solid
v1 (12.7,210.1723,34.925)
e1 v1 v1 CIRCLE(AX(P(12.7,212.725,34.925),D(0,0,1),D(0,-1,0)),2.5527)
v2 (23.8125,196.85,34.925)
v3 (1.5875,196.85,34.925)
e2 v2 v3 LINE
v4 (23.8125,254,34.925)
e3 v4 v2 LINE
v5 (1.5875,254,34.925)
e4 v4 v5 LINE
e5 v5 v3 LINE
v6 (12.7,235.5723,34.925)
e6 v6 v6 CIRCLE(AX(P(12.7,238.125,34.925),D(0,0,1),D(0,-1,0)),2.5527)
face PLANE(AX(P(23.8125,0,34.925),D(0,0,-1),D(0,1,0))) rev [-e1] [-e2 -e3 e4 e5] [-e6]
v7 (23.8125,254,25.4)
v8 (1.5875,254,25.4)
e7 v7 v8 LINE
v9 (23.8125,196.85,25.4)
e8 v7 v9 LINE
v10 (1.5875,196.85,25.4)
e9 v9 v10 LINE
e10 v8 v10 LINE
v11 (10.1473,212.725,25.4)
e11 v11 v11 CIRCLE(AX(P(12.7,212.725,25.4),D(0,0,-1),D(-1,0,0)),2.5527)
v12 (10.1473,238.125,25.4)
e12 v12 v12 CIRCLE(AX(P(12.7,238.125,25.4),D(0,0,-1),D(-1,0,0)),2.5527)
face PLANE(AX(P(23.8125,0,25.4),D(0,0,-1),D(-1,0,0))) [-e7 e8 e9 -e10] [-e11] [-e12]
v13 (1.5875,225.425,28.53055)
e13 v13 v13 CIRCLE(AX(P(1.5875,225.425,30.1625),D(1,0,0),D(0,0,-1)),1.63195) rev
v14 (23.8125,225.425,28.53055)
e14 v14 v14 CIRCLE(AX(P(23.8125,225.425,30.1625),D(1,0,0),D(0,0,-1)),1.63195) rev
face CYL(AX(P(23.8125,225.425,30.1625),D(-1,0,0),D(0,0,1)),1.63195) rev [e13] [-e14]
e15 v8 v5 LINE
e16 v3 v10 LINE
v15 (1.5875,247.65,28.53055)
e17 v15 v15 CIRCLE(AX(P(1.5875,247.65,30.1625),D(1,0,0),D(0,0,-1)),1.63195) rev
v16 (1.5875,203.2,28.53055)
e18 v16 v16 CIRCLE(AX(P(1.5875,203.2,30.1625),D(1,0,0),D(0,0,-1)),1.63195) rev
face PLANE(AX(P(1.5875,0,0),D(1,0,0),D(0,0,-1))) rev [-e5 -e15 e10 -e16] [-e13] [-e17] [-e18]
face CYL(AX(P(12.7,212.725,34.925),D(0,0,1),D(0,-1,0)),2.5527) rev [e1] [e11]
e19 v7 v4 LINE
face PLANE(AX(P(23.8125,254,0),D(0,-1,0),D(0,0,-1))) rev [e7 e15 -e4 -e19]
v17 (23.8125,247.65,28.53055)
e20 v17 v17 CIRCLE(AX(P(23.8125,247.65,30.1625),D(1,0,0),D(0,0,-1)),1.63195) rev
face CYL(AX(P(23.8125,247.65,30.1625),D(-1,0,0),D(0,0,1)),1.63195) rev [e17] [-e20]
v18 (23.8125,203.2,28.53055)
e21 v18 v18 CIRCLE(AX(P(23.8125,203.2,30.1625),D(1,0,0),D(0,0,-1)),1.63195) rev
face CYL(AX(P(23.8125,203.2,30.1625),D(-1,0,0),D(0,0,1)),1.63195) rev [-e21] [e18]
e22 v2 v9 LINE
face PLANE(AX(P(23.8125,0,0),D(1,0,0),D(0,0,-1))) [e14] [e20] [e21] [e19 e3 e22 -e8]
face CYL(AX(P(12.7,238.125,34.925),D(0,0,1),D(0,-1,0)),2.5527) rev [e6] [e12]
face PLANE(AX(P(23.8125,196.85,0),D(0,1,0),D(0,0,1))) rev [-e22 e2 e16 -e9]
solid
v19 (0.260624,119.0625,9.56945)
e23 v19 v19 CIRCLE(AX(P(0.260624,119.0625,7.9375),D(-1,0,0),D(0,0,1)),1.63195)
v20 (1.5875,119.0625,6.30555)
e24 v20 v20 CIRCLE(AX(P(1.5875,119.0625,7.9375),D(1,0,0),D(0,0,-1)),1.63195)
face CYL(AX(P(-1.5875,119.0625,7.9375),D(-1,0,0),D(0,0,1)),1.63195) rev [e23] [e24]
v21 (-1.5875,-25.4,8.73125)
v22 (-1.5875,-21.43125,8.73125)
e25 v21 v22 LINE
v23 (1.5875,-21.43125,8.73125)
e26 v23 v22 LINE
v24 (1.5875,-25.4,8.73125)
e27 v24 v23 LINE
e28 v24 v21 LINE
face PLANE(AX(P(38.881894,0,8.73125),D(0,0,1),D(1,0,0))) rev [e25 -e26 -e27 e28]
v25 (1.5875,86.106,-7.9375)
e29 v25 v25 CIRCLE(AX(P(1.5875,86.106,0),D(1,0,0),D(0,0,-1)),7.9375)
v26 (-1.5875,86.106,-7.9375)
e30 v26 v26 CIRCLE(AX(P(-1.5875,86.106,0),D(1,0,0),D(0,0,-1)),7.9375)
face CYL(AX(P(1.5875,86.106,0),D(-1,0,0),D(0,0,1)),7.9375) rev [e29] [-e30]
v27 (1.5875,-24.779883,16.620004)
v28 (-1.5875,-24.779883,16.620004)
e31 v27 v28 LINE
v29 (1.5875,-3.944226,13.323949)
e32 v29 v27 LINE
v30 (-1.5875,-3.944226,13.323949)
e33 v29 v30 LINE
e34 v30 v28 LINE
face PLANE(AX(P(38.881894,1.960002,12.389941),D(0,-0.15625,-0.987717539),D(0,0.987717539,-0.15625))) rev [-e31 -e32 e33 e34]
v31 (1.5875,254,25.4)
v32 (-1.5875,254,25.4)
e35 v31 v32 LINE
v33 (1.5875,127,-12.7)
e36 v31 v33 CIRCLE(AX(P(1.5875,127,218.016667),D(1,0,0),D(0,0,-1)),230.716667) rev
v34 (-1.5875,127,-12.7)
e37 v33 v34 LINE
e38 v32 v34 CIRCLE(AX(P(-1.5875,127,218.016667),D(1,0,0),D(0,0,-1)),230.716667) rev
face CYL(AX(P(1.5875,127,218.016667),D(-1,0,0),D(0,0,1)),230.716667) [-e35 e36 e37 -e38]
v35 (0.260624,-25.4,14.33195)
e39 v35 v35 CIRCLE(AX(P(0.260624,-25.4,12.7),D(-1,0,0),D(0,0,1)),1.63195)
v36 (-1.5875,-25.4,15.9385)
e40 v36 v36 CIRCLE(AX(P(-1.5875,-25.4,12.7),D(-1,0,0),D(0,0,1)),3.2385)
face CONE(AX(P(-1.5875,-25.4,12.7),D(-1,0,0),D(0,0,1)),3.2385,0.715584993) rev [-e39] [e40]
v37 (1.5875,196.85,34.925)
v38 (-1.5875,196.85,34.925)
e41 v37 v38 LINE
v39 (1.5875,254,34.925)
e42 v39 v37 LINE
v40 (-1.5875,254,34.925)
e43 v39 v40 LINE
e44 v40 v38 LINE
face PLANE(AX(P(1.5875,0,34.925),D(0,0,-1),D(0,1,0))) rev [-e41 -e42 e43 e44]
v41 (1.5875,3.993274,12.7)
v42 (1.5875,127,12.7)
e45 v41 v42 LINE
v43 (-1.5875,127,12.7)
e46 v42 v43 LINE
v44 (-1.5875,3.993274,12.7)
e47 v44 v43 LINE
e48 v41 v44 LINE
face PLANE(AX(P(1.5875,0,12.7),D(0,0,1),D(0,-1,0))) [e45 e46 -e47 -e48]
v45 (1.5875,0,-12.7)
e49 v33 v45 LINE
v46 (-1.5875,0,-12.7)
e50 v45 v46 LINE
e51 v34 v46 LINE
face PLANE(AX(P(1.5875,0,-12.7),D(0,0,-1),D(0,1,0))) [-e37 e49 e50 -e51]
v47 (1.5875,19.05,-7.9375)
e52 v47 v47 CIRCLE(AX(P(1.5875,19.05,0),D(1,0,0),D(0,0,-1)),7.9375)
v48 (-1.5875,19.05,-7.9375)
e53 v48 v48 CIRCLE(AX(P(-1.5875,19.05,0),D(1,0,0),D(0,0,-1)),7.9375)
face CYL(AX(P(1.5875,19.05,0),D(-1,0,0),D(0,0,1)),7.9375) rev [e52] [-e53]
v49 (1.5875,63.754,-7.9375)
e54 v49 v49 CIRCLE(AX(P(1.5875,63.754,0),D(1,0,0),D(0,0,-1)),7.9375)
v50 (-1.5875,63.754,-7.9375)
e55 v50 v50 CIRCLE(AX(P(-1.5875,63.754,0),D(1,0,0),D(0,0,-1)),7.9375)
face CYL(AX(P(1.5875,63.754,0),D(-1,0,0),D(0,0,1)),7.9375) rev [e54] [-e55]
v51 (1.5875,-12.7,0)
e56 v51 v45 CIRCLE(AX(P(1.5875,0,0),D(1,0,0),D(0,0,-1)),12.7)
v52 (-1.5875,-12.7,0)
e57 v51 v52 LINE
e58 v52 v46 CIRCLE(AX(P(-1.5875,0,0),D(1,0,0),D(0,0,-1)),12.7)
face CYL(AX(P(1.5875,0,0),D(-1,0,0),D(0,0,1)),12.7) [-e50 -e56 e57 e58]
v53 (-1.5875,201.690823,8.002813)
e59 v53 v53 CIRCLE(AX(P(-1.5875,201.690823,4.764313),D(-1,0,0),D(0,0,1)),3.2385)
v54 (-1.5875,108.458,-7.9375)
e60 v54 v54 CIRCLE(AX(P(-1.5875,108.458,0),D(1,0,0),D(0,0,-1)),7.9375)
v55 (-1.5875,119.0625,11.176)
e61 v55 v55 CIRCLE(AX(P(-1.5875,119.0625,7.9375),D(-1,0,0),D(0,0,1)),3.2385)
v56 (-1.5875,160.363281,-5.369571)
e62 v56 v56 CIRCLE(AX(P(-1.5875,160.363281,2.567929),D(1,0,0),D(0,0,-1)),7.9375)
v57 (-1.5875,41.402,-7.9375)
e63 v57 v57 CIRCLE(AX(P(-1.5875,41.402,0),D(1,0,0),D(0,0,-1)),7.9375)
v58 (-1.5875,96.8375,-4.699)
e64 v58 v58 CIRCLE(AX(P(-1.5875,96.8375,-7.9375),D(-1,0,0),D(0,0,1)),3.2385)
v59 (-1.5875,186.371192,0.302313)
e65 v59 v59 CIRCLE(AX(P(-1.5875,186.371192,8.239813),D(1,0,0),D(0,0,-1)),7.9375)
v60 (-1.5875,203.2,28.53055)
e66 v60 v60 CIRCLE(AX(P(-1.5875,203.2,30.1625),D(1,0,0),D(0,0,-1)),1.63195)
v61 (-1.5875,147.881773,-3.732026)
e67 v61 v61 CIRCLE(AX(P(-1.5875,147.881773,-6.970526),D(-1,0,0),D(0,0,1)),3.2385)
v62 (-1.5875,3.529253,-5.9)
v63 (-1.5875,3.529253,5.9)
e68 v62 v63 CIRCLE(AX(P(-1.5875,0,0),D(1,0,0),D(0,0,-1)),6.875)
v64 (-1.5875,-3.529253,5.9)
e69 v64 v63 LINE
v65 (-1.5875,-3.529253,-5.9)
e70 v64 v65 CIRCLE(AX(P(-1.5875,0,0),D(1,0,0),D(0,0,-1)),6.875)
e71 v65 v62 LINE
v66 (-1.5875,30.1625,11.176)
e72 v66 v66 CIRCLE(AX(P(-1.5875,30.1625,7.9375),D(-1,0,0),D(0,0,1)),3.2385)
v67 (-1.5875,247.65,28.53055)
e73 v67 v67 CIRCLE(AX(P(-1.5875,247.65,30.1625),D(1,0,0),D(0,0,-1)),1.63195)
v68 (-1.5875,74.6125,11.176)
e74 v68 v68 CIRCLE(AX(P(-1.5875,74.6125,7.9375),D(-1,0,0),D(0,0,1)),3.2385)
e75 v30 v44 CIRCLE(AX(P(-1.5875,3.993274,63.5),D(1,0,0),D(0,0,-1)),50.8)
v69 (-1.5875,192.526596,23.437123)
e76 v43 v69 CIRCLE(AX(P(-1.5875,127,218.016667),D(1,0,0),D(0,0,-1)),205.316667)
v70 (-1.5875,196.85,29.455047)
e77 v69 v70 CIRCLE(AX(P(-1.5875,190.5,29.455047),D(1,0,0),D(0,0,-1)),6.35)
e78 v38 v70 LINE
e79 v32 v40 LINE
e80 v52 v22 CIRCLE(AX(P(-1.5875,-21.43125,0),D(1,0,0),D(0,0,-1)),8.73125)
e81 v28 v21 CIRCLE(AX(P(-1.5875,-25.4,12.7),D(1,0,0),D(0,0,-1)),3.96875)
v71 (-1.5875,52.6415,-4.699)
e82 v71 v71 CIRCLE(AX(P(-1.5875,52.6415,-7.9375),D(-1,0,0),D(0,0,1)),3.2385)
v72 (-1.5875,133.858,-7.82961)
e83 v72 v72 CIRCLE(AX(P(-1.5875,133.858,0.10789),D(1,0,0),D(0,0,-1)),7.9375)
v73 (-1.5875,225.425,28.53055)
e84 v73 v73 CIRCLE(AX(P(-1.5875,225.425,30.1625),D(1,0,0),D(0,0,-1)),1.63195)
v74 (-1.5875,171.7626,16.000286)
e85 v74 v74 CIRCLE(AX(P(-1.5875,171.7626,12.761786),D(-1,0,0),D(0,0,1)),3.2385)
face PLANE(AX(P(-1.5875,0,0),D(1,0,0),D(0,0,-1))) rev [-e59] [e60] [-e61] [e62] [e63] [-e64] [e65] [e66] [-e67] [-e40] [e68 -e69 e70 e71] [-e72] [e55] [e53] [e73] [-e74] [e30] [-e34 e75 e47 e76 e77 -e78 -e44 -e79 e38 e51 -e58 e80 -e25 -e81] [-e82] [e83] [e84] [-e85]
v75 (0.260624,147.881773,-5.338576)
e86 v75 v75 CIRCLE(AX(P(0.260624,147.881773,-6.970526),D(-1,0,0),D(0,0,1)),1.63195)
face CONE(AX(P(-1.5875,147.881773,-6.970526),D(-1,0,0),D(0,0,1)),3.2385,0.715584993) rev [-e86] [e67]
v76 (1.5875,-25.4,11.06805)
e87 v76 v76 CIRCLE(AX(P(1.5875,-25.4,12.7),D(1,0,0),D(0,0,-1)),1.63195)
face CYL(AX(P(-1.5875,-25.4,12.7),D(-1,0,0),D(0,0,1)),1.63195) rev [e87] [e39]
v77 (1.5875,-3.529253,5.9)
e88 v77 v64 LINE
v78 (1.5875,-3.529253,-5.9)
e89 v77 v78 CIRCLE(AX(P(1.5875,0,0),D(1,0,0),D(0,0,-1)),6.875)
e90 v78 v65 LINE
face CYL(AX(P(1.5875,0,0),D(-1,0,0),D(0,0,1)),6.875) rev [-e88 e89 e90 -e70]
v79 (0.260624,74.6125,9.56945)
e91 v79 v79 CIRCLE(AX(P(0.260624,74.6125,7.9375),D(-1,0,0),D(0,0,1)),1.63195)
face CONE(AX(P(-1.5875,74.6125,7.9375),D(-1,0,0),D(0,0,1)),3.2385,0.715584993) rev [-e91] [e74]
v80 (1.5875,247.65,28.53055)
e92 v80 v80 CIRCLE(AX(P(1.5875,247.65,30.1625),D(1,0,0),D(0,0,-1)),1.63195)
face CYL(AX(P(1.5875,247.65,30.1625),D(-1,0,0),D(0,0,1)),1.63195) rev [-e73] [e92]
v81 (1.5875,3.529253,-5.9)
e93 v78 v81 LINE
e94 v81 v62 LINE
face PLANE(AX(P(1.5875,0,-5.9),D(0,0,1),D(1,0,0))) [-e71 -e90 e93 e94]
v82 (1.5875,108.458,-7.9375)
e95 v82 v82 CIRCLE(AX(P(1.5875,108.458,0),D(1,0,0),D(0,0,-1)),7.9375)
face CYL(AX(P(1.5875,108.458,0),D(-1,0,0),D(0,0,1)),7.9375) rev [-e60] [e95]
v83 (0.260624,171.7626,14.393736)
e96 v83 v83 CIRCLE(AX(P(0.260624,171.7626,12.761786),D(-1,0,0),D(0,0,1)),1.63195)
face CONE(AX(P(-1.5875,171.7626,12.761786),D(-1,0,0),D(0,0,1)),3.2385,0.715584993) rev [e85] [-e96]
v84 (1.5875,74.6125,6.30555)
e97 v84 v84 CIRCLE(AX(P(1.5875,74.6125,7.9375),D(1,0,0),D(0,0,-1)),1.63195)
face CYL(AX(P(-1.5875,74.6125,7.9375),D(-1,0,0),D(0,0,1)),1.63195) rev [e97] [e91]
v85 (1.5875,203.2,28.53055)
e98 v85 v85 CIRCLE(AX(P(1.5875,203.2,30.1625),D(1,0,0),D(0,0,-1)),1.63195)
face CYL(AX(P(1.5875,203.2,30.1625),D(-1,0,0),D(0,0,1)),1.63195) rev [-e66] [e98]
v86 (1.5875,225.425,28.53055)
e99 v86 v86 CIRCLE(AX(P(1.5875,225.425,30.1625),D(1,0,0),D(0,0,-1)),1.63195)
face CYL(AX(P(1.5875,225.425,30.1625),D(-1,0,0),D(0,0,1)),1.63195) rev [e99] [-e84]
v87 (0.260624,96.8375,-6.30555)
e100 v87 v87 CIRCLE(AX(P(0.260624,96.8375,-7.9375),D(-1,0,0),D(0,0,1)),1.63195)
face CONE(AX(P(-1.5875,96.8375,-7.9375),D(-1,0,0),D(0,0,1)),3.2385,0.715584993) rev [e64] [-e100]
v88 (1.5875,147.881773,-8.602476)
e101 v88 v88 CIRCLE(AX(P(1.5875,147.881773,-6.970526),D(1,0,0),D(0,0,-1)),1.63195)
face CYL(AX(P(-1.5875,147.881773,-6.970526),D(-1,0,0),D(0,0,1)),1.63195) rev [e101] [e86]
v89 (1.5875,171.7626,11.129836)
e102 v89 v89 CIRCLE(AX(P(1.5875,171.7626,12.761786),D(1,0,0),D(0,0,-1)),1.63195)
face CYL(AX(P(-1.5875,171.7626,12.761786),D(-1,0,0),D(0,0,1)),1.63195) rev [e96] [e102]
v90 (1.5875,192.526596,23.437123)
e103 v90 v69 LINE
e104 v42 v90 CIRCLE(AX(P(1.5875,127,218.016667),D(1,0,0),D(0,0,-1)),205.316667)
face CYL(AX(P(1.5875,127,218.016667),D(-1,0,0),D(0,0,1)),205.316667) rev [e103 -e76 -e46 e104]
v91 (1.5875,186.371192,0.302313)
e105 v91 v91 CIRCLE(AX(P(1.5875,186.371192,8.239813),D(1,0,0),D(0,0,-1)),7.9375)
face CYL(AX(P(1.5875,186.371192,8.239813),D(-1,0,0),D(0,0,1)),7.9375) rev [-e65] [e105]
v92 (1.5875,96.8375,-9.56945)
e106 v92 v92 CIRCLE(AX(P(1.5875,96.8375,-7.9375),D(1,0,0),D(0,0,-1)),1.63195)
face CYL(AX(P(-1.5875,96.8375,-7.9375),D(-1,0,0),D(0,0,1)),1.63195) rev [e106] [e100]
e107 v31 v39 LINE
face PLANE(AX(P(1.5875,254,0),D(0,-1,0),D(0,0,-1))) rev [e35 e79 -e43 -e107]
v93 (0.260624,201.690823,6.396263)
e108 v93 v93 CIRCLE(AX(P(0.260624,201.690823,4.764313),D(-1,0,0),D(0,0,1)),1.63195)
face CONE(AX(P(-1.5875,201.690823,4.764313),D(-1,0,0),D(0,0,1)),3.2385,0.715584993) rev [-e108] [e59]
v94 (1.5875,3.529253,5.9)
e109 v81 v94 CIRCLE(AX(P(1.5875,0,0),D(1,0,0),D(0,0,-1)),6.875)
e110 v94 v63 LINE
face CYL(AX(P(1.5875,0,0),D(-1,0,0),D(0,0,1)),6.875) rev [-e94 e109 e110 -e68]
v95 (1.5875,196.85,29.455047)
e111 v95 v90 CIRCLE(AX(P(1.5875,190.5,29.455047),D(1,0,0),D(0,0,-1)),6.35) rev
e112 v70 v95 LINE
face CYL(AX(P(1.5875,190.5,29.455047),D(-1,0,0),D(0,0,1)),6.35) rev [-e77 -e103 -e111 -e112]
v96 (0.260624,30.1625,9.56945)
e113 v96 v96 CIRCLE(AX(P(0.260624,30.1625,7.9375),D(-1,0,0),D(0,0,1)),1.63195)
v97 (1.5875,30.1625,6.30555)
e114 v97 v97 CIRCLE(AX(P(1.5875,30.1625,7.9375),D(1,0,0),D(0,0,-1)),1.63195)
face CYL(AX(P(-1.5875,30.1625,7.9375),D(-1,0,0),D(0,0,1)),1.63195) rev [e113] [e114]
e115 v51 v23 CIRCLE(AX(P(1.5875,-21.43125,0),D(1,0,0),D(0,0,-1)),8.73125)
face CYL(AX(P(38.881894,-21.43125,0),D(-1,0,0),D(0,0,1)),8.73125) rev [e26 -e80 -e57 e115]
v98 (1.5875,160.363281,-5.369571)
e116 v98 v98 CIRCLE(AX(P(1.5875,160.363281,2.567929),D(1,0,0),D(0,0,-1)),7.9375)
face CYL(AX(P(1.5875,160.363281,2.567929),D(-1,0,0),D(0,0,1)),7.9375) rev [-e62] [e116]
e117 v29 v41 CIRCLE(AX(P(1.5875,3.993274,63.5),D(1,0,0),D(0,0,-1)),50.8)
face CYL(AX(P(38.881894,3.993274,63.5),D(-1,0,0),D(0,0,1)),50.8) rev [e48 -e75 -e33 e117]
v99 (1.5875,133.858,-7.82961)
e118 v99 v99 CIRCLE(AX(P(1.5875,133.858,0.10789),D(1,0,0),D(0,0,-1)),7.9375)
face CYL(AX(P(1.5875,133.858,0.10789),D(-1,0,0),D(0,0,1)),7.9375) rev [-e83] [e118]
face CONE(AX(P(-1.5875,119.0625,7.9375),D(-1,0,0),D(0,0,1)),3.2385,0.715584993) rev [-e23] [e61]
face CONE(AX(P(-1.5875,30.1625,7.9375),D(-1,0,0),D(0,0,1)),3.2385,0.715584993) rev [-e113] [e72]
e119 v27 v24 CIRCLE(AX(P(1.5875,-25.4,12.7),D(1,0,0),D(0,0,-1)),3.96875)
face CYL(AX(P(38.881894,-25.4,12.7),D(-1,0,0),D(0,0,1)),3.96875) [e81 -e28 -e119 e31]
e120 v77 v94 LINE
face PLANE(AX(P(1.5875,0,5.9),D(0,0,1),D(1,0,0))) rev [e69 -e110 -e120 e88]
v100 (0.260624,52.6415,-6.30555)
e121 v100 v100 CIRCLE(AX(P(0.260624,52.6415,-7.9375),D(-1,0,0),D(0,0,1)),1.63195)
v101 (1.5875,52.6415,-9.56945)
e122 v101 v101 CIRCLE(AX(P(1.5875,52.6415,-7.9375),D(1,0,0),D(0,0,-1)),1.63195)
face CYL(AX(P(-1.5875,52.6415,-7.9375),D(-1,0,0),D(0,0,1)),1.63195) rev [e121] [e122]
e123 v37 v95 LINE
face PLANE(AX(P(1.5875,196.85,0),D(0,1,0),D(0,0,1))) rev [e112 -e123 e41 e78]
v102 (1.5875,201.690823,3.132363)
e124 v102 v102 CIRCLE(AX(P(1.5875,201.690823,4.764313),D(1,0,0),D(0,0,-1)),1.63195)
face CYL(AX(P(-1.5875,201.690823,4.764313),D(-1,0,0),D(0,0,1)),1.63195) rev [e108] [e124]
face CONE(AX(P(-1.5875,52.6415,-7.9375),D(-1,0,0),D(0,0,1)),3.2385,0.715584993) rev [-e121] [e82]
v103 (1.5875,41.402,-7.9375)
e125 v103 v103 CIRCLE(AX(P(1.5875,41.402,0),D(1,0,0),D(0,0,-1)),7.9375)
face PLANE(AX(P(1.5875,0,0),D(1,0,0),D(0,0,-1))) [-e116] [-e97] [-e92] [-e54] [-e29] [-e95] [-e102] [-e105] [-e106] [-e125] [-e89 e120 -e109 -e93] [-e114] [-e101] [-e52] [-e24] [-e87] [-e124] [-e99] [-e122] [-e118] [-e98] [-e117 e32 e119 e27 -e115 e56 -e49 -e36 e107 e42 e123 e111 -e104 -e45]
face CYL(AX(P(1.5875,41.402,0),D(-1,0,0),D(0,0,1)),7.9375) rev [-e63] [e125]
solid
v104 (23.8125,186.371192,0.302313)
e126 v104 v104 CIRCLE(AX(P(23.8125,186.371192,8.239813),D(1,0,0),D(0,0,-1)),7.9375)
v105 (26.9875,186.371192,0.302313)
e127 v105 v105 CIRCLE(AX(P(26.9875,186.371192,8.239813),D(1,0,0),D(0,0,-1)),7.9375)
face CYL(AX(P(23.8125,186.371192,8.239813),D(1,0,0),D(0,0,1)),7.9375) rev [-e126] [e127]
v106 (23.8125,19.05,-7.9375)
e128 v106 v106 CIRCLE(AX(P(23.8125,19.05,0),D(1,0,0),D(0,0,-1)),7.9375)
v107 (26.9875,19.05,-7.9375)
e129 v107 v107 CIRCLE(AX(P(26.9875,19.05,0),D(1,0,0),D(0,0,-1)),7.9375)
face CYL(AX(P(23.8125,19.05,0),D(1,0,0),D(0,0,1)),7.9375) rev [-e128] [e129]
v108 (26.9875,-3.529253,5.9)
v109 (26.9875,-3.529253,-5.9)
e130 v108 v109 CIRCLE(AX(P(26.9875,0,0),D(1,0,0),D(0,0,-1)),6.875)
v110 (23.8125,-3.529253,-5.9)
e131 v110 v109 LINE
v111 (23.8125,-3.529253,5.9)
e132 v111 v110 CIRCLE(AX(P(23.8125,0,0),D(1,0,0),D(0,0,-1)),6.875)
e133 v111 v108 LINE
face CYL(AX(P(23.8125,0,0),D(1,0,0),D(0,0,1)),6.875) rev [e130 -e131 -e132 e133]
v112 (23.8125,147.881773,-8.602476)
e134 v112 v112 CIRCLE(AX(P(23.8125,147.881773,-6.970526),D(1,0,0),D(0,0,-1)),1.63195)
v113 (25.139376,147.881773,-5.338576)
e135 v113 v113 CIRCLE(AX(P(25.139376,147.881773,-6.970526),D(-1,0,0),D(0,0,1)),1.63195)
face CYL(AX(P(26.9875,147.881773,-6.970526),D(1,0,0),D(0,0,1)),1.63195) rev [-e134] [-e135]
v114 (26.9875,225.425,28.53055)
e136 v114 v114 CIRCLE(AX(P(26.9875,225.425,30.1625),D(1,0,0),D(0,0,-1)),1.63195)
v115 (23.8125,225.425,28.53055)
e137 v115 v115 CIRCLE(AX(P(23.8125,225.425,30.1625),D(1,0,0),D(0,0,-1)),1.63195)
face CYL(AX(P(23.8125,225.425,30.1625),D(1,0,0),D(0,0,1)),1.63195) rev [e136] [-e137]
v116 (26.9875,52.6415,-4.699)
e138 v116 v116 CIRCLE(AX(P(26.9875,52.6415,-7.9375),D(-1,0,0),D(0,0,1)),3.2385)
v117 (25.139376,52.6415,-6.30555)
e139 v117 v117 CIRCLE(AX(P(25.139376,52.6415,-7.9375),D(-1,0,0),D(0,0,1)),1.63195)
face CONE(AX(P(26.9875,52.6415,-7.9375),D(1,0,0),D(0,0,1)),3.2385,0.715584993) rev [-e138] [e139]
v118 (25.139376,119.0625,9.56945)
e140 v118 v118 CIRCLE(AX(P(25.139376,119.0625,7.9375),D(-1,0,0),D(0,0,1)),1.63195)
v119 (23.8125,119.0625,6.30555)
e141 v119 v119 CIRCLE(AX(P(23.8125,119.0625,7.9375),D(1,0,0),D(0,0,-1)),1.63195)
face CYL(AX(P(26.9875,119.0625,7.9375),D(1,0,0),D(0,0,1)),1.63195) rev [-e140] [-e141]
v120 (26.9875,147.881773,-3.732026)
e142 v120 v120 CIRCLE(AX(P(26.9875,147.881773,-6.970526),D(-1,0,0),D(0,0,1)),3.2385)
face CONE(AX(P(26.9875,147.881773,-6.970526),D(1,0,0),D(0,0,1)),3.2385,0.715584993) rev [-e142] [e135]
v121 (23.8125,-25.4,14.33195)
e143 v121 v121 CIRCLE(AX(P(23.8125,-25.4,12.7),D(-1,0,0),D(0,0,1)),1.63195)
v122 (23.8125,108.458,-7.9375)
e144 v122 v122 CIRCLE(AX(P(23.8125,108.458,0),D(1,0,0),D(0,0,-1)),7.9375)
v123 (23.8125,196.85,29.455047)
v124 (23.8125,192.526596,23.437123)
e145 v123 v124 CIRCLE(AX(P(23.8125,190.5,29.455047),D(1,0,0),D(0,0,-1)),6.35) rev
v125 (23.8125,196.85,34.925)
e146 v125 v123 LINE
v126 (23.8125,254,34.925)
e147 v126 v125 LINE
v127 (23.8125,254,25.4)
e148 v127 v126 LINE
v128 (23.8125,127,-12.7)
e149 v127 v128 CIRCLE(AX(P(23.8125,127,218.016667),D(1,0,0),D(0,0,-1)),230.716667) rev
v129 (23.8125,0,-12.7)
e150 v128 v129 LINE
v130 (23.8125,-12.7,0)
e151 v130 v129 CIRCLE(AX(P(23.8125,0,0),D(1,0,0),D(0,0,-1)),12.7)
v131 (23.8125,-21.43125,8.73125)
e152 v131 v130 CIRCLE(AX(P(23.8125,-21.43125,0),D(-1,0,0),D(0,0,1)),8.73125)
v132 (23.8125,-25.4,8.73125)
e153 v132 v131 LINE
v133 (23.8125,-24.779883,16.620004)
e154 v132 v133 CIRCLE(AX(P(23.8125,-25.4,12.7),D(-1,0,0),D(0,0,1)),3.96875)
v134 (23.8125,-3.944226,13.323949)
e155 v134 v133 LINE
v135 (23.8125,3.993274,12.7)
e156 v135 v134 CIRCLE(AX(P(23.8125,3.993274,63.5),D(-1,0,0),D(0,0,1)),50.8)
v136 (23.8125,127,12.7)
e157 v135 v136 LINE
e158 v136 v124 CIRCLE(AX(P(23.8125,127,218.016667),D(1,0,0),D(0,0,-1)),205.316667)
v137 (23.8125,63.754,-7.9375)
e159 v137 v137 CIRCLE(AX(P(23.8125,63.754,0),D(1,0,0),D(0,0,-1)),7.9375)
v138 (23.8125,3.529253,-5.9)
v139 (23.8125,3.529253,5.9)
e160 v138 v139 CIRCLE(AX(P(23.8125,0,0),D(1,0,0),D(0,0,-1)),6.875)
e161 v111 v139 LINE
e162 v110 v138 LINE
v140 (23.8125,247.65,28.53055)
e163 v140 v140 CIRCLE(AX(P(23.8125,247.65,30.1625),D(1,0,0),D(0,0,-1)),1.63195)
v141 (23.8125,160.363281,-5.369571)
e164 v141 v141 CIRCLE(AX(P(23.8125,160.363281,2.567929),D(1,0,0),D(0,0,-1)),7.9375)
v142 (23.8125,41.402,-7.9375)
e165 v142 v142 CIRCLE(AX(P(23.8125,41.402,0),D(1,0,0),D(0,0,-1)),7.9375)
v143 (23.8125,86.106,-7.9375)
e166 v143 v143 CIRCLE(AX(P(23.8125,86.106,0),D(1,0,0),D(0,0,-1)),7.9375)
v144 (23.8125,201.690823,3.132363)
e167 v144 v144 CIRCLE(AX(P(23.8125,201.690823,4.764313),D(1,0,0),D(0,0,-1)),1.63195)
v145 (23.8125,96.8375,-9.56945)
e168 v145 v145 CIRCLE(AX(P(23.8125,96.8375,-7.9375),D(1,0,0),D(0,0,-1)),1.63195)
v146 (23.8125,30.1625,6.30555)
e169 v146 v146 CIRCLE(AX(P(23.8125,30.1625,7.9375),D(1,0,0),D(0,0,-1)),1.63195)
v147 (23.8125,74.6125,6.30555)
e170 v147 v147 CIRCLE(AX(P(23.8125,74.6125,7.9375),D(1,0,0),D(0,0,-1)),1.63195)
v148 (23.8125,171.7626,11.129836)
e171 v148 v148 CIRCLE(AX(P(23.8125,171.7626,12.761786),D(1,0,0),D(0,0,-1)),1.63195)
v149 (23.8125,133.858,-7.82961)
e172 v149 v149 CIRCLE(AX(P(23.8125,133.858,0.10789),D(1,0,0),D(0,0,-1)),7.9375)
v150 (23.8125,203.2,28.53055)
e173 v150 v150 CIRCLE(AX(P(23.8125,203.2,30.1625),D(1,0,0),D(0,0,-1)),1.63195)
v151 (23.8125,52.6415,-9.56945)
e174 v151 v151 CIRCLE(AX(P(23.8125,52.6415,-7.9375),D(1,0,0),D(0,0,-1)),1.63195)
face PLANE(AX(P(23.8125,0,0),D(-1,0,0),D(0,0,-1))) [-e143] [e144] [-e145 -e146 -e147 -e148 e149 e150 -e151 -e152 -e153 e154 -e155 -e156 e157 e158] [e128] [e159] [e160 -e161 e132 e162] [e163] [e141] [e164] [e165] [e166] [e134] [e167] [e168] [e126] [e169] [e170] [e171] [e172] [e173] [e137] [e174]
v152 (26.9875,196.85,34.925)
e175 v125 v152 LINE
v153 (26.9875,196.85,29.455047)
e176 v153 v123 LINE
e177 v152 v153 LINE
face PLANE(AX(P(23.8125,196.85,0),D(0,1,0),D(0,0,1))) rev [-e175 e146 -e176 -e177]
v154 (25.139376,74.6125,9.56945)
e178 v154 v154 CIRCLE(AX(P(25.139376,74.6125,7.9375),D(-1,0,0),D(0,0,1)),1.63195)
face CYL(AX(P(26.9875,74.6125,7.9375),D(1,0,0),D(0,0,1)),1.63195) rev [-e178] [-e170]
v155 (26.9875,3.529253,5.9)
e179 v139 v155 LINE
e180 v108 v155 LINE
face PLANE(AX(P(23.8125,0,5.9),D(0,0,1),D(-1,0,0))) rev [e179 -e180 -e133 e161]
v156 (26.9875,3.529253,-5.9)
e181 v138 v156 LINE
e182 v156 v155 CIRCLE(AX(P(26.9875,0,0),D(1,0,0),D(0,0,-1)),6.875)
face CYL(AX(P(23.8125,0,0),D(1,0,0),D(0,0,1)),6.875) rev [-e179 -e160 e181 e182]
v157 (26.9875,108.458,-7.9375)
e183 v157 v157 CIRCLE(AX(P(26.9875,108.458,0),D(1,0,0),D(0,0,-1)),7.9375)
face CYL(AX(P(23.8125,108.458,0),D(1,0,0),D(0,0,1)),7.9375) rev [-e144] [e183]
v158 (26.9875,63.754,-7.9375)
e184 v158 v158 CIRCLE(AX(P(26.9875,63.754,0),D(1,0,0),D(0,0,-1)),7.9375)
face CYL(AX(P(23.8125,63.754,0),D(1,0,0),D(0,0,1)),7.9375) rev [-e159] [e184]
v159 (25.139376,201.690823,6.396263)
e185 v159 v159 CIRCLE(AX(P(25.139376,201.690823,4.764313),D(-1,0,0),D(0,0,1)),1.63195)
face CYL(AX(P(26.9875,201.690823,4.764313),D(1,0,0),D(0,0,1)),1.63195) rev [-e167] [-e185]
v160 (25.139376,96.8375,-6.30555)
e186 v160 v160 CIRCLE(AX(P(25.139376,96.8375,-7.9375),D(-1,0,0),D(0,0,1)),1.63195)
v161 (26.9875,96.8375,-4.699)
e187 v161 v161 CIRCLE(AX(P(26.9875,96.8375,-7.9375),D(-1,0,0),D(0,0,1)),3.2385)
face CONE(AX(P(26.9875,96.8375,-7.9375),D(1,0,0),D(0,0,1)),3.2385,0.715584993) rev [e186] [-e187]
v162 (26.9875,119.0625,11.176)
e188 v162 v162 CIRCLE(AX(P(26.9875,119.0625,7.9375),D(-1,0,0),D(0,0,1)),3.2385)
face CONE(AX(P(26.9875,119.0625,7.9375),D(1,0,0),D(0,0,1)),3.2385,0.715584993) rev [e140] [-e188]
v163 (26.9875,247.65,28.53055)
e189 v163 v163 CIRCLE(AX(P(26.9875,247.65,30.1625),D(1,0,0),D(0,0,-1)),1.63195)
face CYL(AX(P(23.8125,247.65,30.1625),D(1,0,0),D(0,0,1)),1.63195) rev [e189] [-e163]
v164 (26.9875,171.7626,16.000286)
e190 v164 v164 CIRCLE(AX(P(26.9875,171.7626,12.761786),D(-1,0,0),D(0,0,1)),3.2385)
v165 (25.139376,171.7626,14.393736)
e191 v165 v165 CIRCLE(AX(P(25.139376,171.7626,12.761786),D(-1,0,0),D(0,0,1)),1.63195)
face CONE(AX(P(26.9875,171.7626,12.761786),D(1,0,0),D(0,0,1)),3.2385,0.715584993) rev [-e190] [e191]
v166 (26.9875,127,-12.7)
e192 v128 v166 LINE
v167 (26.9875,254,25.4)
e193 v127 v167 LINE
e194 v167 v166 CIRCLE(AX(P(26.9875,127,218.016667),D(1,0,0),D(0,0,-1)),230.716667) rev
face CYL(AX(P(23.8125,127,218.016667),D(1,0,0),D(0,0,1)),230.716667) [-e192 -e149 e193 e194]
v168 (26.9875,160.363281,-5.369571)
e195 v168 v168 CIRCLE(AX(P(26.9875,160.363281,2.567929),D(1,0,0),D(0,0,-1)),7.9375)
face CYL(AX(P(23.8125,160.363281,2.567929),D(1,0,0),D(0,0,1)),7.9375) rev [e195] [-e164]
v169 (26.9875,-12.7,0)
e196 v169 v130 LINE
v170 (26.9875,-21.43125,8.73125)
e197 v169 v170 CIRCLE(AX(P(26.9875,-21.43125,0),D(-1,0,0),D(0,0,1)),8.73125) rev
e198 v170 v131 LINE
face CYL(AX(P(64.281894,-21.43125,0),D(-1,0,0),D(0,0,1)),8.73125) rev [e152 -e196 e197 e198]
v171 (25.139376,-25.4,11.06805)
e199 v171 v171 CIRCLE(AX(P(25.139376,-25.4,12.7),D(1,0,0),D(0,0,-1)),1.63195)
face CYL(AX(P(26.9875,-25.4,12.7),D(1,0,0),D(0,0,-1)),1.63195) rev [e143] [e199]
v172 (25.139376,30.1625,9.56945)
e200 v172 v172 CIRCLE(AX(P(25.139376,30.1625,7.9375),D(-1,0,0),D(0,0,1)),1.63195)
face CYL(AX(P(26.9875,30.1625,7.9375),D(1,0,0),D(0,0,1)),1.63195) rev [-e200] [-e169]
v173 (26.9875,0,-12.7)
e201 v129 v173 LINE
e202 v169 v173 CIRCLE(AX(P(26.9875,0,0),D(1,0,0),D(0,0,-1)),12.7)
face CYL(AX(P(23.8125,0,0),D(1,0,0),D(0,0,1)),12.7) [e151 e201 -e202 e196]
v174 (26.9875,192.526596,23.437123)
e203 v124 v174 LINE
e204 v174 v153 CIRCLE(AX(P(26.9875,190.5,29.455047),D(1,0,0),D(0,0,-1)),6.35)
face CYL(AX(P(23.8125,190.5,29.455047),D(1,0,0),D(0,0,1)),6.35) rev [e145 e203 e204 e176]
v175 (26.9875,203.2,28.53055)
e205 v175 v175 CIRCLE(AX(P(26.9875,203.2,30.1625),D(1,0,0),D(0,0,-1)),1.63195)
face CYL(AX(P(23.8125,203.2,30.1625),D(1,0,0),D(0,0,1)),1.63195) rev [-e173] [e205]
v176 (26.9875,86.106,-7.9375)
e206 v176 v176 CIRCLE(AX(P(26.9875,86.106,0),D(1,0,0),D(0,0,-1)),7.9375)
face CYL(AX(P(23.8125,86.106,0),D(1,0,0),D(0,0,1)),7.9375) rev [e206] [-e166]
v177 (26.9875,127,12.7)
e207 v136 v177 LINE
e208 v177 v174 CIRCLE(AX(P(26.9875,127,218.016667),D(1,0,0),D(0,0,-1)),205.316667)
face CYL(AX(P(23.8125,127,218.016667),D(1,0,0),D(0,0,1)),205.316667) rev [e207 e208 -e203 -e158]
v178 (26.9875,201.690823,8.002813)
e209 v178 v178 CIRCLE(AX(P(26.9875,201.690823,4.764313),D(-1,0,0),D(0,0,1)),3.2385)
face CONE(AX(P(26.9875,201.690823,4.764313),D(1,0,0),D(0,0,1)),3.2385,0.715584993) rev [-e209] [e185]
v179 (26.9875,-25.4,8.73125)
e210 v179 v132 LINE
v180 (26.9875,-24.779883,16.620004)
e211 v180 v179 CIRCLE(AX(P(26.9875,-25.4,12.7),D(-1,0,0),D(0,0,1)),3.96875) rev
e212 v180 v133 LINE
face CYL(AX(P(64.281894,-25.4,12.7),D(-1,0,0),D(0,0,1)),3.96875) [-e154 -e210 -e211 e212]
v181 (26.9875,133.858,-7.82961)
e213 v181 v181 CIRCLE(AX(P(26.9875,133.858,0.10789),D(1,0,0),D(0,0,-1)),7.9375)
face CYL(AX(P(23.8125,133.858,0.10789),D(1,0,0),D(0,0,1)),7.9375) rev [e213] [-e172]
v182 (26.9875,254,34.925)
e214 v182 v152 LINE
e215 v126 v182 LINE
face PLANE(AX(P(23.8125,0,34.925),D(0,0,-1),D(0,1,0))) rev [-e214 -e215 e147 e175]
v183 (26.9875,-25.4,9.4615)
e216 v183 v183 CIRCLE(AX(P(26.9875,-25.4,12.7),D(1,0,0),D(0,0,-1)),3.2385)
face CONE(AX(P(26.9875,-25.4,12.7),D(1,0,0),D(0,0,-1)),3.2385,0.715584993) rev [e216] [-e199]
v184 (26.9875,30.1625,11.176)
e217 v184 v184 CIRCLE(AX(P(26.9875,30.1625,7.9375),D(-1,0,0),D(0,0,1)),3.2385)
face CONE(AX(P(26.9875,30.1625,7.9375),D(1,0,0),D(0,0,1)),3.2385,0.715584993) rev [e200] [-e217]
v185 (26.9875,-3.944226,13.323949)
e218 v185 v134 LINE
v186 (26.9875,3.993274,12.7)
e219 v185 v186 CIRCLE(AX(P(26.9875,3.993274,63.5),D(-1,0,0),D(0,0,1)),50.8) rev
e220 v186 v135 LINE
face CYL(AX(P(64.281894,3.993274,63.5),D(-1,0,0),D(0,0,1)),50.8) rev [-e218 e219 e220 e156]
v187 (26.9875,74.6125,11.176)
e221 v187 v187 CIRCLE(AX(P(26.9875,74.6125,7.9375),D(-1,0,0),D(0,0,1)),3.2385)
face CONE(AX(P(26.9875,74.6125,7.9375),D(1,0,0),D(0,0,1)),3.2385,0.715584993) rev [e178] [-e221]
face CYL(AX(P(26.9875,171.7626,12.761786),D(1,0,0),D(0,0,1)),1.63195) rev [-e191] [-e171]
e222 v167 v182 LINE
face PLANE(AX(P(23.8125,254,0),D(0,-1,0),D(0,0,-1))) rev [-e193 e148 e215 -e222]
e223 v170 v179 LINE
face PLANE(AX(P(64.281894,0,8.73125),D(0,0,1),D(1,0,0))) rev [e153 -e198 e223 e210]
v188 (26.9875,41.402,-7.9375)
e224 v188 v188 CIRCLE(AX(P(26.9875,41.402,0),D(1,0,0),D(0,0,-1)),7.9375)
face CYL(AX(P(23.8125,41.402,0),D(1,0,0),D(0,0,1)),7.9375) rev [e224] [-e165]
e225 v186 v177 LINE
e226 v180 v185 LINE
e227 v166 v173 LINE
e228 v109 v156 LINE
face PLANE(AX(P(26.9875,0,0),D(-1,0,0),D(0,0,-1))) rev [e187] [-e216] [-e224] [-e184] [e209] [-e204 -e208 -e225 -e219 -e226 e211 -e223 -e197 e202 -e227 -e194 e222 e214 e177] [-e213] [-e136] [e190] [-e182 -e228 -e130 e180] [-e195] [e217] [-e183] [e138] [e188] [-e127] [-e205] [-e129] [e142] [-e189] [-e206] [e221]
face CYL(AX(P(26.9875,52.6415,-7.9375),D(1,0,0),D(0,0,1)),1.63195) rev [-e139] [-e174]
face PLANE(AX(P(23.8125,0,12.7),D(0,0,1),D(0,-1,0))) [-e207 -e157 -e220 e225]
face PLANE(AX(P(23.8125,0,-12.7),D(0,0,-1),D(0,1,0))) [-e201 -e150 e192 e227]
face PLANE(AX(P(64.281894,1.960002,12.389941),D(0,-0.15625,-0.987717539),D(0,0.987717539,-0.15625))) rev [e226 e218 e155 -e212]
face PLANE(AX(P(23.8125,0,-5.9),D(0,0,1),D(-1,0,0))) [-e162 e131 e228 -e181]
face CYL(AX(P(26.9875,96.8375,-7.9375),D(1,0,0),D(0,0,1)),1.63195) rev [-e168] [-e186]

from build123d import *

# Parameters (mm, degrees)
SKETCH1_R                                     = 7.9375
SKETCH1_R_2                                   = 1.5875
SKETCH1_R_3                                   = 1.63195
BOSS_EXTRUDE1_DEPTH                           = 1.5875
SKETCH2_W                                     = 9.525
SKETCH2_H                                     = 57.15
SKETCH2_R                                     = 1.63195
BOSS_EXTRUDE2_DEPTH                           = 22.225
CSK_FOR_4_FLAT_HEAD_SOCKET_CAP_SCREW1_A_COUNT = 2
CSK_FOR_4_FLAT_HEAD_SOCKET_CAP_SCREW1_A_PITCH = 30.978348795
CSK_FOR_4_FLAT_HEAD_SOCKET_CAP_SCRE_2_COUNT   = 2
CSK_FOR_4_FLAT_HEAD_SOCKET_CAP_SCRE_2_PITCH   = 55.073771863
CSK_FOR_4_FLAT_HEAD_SOCKET_CAP_SCRE_3_COUNT   = 2
CSK_FOR_4_FLAT_HEAD_SOCKET_CAP_SCRE_3_PITCH   = 82.68923077
CSK_FOR_4_FLAT_HEAD_SOCKET_CAP_SCRE_4_COUNT   = 2
CSK_FOR_4_FLAT_HEAD_SOCKET_CAP_SCRE_4_PITCH   = 105.619862735
CSK_FOR_4_FLAT_HEAD_SOCKET_CAP_SCRE_5_COUNT   = 2
CSK_FOR_4_FLAT_HEAD_SOCKET_CAP_SCRE_5_PITCH   = 127.117934627
CSK_FOR_4_FLAT_HEAD_SOCKET_CAP_SCRE_6_COUNT   = 2
CSK_FOR_4_FLAT_HEAD_SOCKET_CAP_SCRE_6_PITCH   = 149.589560968
CSK_FOR_4_FLAT_HEAD_SOCKET_CAP_SCRE_7_COUNT   = 2
CSK_FOR_4_FLAT_HEAD_SOCKET_CAP_SCRE_7_PITCH   = 171.55767171
FILLET1_R                                     = 6.35
SKETCH6_W                                     = 2.5527
SKETCH6_H                                     = 47.625
TAP_DRILL_FOR_1_4_20_TAP1_AT_2_COUNT          = 2
TAP_DRILL_FOR_1_4_20_TAP1_AT_2_PITCH          = 25.4
BOSS_EXTRUDE3_START                           = -1.5875
BOSS_EXTRUDE3_DEPTH                           = 3.175
BOSS_EXTRUDE4_START                           = 23.8125
BOSS_EXTRUDE4_DEPTH                           = 3.175


# Read off the part's stored shape, not the designer's step: Boss-Extrude4
with BuildPart() as part:
    # Sketch1 → Boss-Extrude1 (new, symmetric)
    with BuildSketch(Plane(origin=(0, 0, 0), x_dir=(0, 0, -1), z_dir=(1, 0, 0))):
        with BuildLine():
            Line((-12.7, 0), (-12.7, 127))
            ThreePointArc((-12.7, 127), (-15.784916018, 162.457758539), (-24.94696135, 196.85))
            Line((-24.94696135, 196.85), (-34.925, 196.85))
            Line((-34.925, 196.85), (-34.925, 254))
            Line((-34.925, 254), (-25.4, 254))
            ThreePointArc((-25.4, 254), (2.969821105, 193.295946332), (12.7, 127))
            Line((12.7, 127), (12.7, 0))
            ThreePointArc((12.7, 0), (0, -12.7), (-12.7, 0))
        make_face()
        with Locations((0, 19.05)):
            Circle(SKETCH1_R, mode=Mode.SUBTRACT)
        with Locations((0, 41.402)):
            Circle(SKETCH1_R, mode=Mode.SUBTRACT)
        with Locations((0, 63.754)):
            Circle(SKETCH1_R, mode=Mode.SUBTRACT)
        with Locations((0, 86.106)):
            Circle(SKETCH1_R, mode=Mode.SUBTRACT)
        with Locations((0, 108.458)):
            Circle(SKETCH1_R, mode=Mode.SUBTRACT)
        with Locations((-7.9375, 30.1625)):
            Circle(SKETCH1_R_2, mode=Mode.SUBTRACT)
        with Locations((7.9375, 52.6415)):
            Circle(SKETCH1_R_2, mode=Mode.SUBTRACT)
        with Locations((-7.9375, 74.6125)):
            Circle(SKETCH1_R_2, mode=Mode.SUBTRACT)
        with Locations((-7.9375, 119.0625)):
            Circle(SKETCH1_R_2, mode=Mode.SUBTRACT)
        with Locations((-0.107890385, 133.858)):
            Circle(SKETCH1_R, mode=Mode.SUBTRACT)
        with Locations((-2.567929317, 160.363280996)):
            Circle(SKETCH1_R, mode=Mode.SUBTRACT)
        with Locations((-8.239812683, 186.371192317)):
            Circle(SKETCH1_R, mode=Mode.SUBTRACT)
        with Locations((6.970526306, 147.881772727)):
            Circle(SKETCH1_R_2, mode=Mode.SUBTRACT)
        with Locations((-12.761786397, 171.762600381)):
            Circle(SKETCH1_R_2, mode=Mode.SUBTRACT)
        with Locations((-4.7643129, 201.690823043)):
            Circle(SKETCH1_R_2, mode=Mode.SUBTRACT)
        with Locations((-30.1625, 203.2)):
            Circle(SKETCH1_R_3, mode=Mode.SUBTRACT)
        with Locations((-30.1625, 225.425)):
            Circle(SKETCH1_R_3, mode=Mode.SUBTRACT)
        with Locations((7.9375, 96.8375)):
            Circle(SKETCH1_R_2, mode=Mode.SUBTRACT)
        with Locations((-30.1625, 247.65)):
            Circle(SKETCH1_R_3, mode=Mode.SUBTRACT)
        with BuildLine():
            Line((-5.89999963, -3.529253306), (-5.89999963, 3.529253306))
            ThreePointArc((-5.89999963, 3.529253306), (0, 6.874999966), (5.89999963, 3.529253306))
            Line((5.89999963, 3.529253306), (5.89999963, -3.529253306))
            ThreePointArc((5.89999963, -3.529253306), (0, -6.874999966), (-5.89999963, -3.529253306))
        make_face(mode=Mode.SUBTRACT)
    extrude(amount=BOSS_EXTRUDE1_DEPTH, both=True)

    # Sketch4 → CSK for #4 Flat Head Socket Cap Screw1 (revolve, cut)
    with BuildSketch(Plane(origin=(-1.5875, 201.690823043, 4.7643129), x_dir=(0, 0, 1), z_dir=(0, 1, 0))):
        Polygon((0, 0), (0, 25.4), (1.63195, 25.4), (1.63195, 1.848124365), (3.2385, 0), align=None)
    csk_for_4_flat_head_socket_cap_screw1 = revolve(axis=Axis((-7.9375, 201.690823043, 4.7643129), (1, 0, 0)), mode=Mode.SUBTRACT)

    # CSK for #4 Flat Head Socket Cap Screw1 a: CSK for #4 Flat Head Socket Cap Screw1 ×2
    with Locations(*[Vector(0, -0.9661012877208287, 0.2581633240105121) * (i * CSK_FOR_4_FLAT_HEAD_SOCKET_CAP_SCREW1_A_PITCH) for i in range(1, CSK_FOR_4_FLAT_HEAD_SOCKET_CAP_SCREW1_A_COUNT)]):
        add(csk_for_4_flat_head_socket_cap_screw1, mode=Mode.SUBTRACT)

    # CSK for _4 Flat Head Socket Cap Scre 2: CSK for #4 Flat Head Socket Cap Screw1 ×2
    with Locations(*[Vector(0, -0.977035864747747, -0.2130749140481406) * (i * CSK_FOR_4_FLAT_HEAD_SOCKET_CAP_SCRE_2_PITCH) for i in range(1, CSK_FOR_4_FLAT_HEAD_SOCKET_CAP_SCRE_2_COUNT)]):
        add(csk_for_4_flat_head_socket_cap_screw1, mode=Mode.SUBTRACT)

    # CSK for _4 Flat Head Socket Cap Scre 3: CSK for #4 Flat Head Socket Cap Screw1 ×2
    with Locations(*[Vector(0, -0.999263414037656, 0.03837485330015198) * (i * CSK_FOR_4_FLAT_HEAD_SOCKET_CAP_SCRE_3_PITCH) for i in range(1, CSK_FOR_4_FLAT_HEAD_SOCKET_CAP_SCRE_3_COUNT)]):
        add(csk_for_4_flat_head_socket_cap_screw1, mode=Mode.SUBTRACT)

    # CSK for _4 Flat Head Socket Cap Scre 4: CSK for #4 Flat Head Socket Cap Screw1 ×2
    with Locations(*[Vector(0, -0.99274246650338, -0.12025969898842027) * (i * CSK_FOR_4_FLAT_HEAD_SOCKET_CAP_SCRE_4_PITCH) for i in range(1, CSK_FOR_4_FLAT_HEAD_SOCKET_CAP_SCRE_4_COUNT)]):
        add(csk_for_4_flat_head_socket_cap_screw1, mode=Mode.SUBTRACT)

    # CSK for _4 Flat Head Socket Cap Scre 5: CSK for #4 Flat Head Socket Cap Screw1 ×2
    with Locations(*[Vector(0, -0.9996883871346716, 0.024962544503297483) * (i * CSK_FOR_4_FLAT_HEAD_SOCKET_CAP_SCRE_5_PITCH) for i in range(1, CSK_FOR_4_FLAT_HEAD_SOCKET_CAP_SCRE_5_COUNT)]):
        add(csk_for_4_flat_head_socket_cap_screw1, mode=Mode.SUBTRACT)

    # CSK for _4 Flat Head Socket Cap Scre 6: CSK for #4 Flat Head Socket Cap Screw1 ×2
    with Locations(*[Vector(0, -0.9963885319187731, -0.08491109150606914) * (i * CSK_FOR_4_FLAT_HEAD_SOCKET_CAP_SCRE_6_PITCH) for i in range(1, CSK_FOR_4_FLAT_HEAD_SOCKET_CAP_SCRE_6_COUNT)]):
        add(csk_for_4_flat_head_socket_cap_screw1, mode=Mode.SUBTRACT)

    # CSK for _4 Flat Head Socket Cap Scre 7: CSK for #4 Flat Head Socket Cap Screw1 ×2
    with Locations(*[Vector(0, -0.9998289282781047, 0.018496328777812505) * (i * CSK_FOR_4_FLAT_HEAD_SOCKET_CAP_SCRE_7_PITCH) for i in range(1, CSK_FOR_4_FLAT_HEAD_SOCKET_CAP_SCRE_7_COUNT)]):
        add(csk_for_4_flat_head_socket_cap_screw1, mode=Mode.SUBTRACT)

    # Fillet1
    fillet1_edges = [part.edges().sort_by_distance(p)[0] for p in [
        (0, 196.85, 24.94696135),
    ]]
    fillet(fillet1_edges, radius=FILLET1_R)


with BuildPart() as body_2:
    # Sketch2 → Boss-Extrude2 (new body)
    with BuildSketch(Plane(origin=(1.5875, 0, 0), x_dir=(0, 0, -1), z_dir=(1, 0, 0))):
        with Locations((-30.1625, 225.425)):
            Rectangle(SKETCH2_W, SKETCH2_H)
        with Locations((-30.1625, 203.2)):
            Circle(SKETCH2_R, mode=Mode.SUBTRACT)
        with Locations((-30.1625, 225.425)):
            Circle(SKETCH2_R, mode=Mode.SUBTRACT)
        with Locations((-30.1625, 247.65)):
            Circle(SKETCH2_R, mode=Mode.SUBTRACT)
    extrude(amount=BOSS_EXTRUDE2_DEPTH)

    # Sketch6 → Tap Drill for 1/4-20 Tap1 (revolve, cut)
    with BuildSketch(Plane(origin=(12.7, 238.125, 34.925), x_dir=(0, -1, 0), z_dir=(1, 0, 0))):
        with Locations((1.27635, 23.8125)):
            Rectangle(SKETCH6_W, SKETCH6_H)
    tap_drill_for_1_4_20_tap1 = revolve(axis=Axis((12.7, 238.125, 41.275), (0, 0, -1)), mode=Mode.SUBTRACT)

    # Tap Drill for 1/4-20 Tap1 at 2: Tap Drill for 1/4-20 Tap1 ×2
    with Locations(*[(0, -i * TAP_DRILL_FOR_1_4_20_TAP1_AT_2_PITCH, 0) for i in range(1, TAP_DRILL_FOR_1_4_20_TAP1_AT_2_COUNT)]):
        add(tap_drill_for_1_4_20_tap1, mode=Mode.SUBTRACT)


with BuildPart() as body_3:
    # Mirror2: mirrored copy
    add(part.part.mirror(Plane(origin=(12.7, 0, 0), x_dir=(0, 0, 1), z_dir=(1, 0, 0))))

    # Boss-Extrude4 outline → Boss-Extrude4 (add)
    with BuildSketch(Plane.YZ.offset(BOSS_EXTRUDE4_START)):
        with BuildLine():
            Line((-3.944226387, 13.323949002), (-24.779882812, 16.620003984))
            ThreePointArc((-24.779882812, 16.620003984), (-29.356544728, 13.011015072), (-25.4, 8.73125))
            Line((-25.4, 8.73125), (-21.43125, 8.73125))
            ThreePointArc((-21.43125, 8.73125), (-15.257323917, 6.173926083), (-12.7, 0))
            ThreePointArc((-12.7, 0), (-8.980256121, 8.980256121), (0, 12.7))
            Line((0, 12.7), (3.993273613, 12.7))
            ThreePointArc((3.993273613, 12.7), (0.01228069, 12.856227477), (-3.944226387, 13.323949002))
        make_face()
    extrude(amount=BOSS_EXTRUDE4_DEPTH)

    # Sketch11 → CSK for #4 Flat Head Socket Cap Screw3 (revolve, cut)
    with BuildSketch(Plane(origin=(26.9875, -25.4, 12.7), x_dir=(0, 0, -1), z_dir=(0, 1, 0))):
        Polygon((0, 0), (0, 22.570574487), (1.63195, 21.59), (1.63195, 1.848124365), (3.2385, 0), align=None)
    revolve(axis=Axis((33.3375, -25.4, 12.7), (-1, 0, 0)), mode=Mode.SUBTRACT)


with BuildPart() as part_1:
    add(part.part)

    # Sketch7 → Boss-Extrude3 (add)
    with BuildSketch(Plane(origin=(0, 0, 0), x_dir=(0, 0, -1), z_dir=(1, 0, 0)).offset(BOSS_EXTRUDE3_START)):
        with BuildLine():
            ThreePointArc((-13.323949002, -3.944226387), (-12.856227477, 0.01228069), (-12.7, 3.993273613))
            Line((-12.7, 3.993273613), (-12.7, 0))
            ThreePointArc((-12.7, 0), (-8.980256121, -8.980256121), (0, -12.7))
            ThreePointArc((0, -12.7), (-6.173926083, -15.257323917), (-8.73125, -21.43125))
            Line((-8.73125, -21.43125), (-8.73125, -25.4))
            ThreePointArc((-8.73125, -25.4), (-13.011015072, -29.356544728), (-16.620003984, -24.779882812))
            Line((-16.620003984, -24.779882812), (-13.323949002, -3.944226387))
        make_face()
    extrude(amount=BOSS_EXTRUDE3_DEPTH)

    # Sketch9 → CSK for #4 Flat Head Socket Cap Screw2 (revolve, cut)
    with BuildSketch(Plane(origin=(-1.5875, -25.4, 12.7), x_dir=(0, 0, 1), z_dir=(0, 1, 0))):
        Polygon((0, 0), (0, 22.570574487), (1.63195, 21.59), (1.63195, 1.848124365), (3.2385, 0), align=None)
    revolve(axis=Axis((-7.9375, -25.4, 12.7), (1, 0, 0)), mode=Mode.SUBTRACT)


solid = Compound([body_2.part, body_3.part, part_1.part])
